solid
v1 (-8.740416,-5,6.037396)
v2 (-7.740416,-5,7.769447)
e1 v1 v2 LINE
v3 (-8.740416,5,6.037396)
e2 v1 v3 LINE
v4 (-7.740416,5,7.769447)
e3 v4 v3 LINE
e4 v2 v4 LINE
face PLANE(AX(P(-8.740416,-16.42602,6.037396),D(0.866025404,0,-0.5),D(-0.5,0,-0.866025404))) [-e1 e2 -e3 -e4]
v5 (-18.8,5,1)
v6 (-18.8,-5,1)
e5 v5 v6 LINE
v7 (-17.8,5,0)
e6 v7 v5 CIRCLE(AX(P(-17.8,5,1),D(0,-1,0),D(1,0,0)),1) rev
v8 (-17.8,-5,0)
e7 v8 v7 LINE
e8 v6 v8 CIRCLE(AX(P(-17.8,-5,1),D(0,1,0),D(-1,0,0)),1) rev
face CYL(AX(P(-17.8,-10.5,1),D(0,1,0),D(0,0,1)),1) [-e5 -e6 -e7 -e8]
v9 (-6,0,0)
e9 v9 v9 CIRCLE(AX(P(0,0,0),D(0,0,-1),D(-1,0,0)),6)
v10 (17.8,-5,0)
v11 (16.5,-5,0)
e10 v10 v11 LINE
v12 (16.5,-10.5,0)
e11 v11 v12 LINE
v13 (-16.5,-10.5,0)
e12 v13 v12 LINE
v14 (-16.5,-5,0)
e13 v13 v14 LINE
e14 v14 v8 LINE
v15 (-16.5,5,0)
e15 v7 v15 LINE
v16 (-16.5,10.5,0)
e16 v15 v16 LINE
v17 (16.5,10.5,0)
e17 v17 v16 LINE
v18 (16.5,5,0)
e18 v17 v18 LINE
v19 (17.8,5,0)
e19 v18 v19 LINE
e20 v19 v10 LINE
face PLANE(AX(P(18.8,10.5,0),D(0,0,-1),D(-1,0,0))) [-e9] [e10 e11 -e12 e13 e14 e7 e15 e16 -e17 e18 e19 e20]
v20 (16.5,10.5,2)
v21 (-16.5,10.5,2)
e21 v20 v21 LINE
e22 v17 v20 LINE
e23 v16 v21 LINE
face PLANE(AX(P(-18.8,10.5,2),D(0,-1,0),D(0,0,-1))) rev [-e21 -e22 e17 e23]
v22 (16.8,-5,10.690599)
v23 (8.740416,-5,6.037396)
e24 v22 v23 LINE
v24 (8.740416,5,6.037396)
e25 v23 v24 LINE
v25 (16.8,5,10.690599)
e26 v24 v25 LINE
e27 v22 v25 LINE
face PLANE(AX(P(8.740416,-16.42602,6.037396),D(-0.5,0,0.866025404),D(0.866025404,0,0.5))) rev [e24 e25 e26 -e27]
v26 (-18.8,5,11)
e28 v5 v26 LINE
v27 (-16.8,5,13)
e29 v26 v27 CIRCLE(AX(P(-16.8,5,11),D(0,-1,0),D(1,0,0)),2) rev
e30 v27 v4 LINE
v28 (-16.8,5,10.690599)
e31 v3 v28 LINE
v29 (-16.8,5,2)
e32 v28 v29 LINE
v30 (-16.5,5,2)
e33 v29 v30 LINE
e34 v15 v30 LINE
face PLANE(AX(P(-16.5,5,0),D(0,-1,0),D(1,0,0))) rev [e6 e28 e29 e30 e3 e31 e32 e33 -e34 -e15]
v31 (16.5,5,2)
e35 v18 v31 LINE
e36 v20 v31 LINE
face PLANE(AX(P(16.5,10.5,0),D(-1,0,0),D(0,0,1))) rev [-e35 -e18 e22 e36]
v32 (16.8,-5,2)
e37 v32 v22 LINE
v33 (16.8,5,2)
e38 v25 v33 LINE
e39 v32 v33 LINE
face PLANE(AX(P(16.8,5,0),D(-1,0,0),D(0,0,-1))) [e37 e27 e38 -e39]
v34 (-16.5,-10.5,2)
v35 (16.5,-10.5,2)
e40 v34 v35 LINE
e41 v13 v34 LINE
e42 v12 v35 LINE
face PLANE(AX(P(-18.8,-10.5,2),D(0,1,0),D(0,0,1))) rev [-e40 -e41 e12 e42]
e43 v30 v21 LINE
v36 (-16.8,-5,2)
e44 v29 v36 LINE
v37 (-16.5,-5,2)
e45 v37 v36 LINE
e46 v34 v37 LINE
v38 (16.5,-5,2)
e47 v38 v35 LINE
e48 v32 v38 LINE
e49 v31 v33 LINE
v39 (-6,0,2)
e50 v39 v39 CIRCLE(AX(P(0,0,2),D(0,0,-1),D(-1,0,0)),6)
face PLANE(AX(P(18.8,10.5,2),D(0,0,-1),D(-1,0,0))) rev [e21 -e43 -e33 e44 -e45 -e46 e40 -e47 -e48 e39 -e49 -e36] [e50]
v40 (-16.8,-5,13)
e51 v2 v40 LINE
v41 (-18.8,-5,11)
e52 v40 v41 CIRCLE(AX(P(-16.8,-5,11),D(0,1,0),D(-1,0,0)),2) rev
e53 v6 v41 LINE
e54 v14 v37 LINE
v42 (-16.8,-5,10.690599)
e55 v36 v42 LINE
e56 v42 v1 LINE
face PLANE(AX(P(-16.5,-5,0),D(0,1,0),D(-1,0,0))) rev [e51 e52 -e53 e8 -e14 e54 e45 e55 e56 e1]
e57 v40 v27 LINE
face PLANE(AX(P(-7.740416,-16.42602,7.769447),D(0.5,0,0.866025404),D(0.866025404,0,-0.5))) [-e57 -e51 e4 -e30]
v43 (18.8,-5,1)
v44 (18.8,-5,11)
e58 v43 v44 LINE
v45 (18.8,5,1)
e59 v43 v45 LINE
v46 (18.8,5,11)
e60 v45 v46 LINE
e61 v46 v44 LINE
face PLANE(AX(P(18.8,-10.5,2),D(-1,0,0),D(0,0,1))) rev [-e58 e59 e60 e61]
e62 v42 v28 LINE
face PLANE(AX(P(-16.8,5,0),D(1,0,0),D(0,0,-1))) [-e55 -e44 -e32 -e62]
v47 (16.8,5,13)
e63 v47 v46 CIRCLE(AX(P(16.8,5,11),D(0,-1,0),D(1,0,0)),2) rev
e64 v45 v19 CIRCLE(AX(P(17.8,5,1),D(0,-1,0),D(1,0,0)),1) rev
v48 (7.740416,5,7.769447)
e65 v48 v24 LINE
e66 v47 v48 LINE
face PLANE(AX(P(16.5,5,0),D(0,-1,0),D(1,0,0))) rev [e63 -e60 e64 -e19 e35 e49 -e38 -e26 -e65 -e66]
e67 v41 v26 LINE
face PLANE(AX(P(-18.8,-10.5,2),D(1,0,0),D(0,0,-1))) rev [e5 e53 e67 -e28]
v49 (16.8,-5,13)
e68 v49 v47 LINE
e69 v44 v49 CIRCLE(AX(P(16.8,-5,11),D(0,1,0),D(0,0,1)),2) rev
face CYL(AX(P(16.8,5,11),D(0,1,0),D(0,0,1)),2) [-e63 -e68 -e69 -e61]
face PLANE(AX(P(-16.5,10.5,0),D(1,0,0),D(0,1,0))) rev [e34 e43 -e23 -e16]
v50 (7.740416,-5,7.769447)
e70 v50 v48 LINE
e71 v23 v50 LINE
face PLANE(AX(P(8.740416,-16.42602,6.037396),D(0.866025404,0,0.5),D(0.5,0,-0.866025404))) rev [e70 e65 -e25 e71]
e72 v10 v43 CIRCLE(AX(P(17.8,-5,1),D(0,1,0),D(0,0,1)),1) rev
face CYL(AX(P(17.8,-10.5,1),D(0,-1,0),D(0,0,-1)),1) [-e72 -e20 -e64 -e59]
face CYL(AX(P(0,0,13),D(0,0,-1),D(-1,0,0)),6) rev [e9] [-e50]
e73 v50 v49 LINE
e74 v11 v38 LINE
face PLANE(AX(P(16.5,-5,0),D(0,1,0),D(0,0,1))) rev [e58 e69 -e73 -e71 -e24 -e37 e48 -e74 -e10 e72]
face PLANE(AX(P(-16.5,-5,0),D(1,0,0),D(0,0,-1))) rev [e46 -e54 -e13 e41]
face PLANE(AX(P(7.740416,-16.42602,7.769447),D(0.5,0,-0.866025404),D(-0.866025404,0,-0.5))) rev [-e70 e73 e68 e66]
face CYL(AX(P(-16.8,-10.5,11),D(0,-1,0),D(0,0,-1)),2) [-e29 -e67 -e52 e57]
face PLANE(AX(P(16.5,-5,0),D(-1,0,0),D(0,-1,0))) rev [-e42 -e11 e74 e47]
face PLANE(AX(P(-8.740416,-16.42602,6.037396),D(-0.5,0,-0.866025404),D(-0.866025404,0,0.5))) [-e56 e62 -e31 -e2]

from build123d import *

# Parameters (mm, degrees)
SKETCH_1_W          = 37.6
SKETCH_1_H          = 21
EXTRUDE_1_DEPTH     = 2
SKETCH_2_W          = 2.3
SKETCH_2_H          = 5.5
CUT_EXTRUDE_1_DEPTH = 22.626141588
SKETCH_4_W          = 13
SKETCH_4_H          = 10
EXTRUDE_2_DEPTH     = 2
EXTRUDE_4_DEPTH     = 10
SKETCH_6_R          = 6
CUT_EXTRUDE_2_DEPTH = 26.153329799
FILLET_1_R          = 2
FILLET_2_R          = 1


with BuildPart() as part:
    # 草图1 → 凸台-拉伸1 (new body)
    with BuildSketch(Plane.XY):
        Rectangle(SKETCH_1_W, SKETCH_1_H)
    extrude(amount=EXTRUDE_1_DEPTH)

    # 草图2 → 切除-拉伸1 (cut, through all)
    with BuildSketch(Plane.XY.offset(2)):
        with Locations((-17.65, 7.75)):
            Rectangle(SKETCH_2_W, SKETCH_2_H)
        with Locations((17.65, 7.75)):
            Rectangle(SKETCH_2_W, SKETCH_2_H)
        with Locations((-17.65, -7.75)):
            Rectangle(SKETCH_2_W, SKETCH_2_H)
        with Locations((17.65, -7.75)):
            Rectangle(SKETCH_2_W, SKETCH_2_H)
    extrude(amount=-CUT_EXTRUDE_1_DEPTH, mode=Mode.SUBTRACT)

    # 草图4 → 凸台-拉伸2 (add)
    with BuildSketch(Plane.ZY.offset(18.8)):
        with Locations((6.5, 0)):
            Rectangle(SKETCH_4_W, SKETCH_4_H)
    extrude_2 = extrude(amount=-EXTRUDE_2_DEPTH)

    # 草图5 → 凸台-拉伸4 (add)
    with BuildSketch(Plane(origin=(0, 5, 0), x_dir=(1, 0, 0), z_dir=(0, 1, 0))):
        Polygon((-8.740415593, -6.037395696), (-16.8, -10.690598923), (-16.8, -13), (-7.740415593, -7.769446504), align=None)
    extrude_4 = extrude(amount=-EXTRUDE_4_DEPTH)

    # 草图6 → 切除-拉伸2 (cut, through all)
    with BuildSketch(Plane(origin=(0, 0, 0), x_dir=(-1, 0, 0), z_dir=(0, 0, -1))):
        Circle(SKETCH_6_R)
    extrude(amount=-CUT_EXTRUDE_2_DEPTH, mode=Mode.SUBTRACT)

    # 镜向2: 凸台-拉伸2 across plane
    add(extrude_2.mirror(Plane(origin=(0, 0, 0), x_dir=(0, 0, 1), z_dir=(1, 0, 0))))

    # 镜向3: 凸台-拉伸4 across plane
    add(extrude_4.mirror(Plane(origin=(0, 0, 0), x_dir=(0, 0, 1), z_dir=(1, 0, 0))))

    # 圆角1
    fillet_1_edges = [part.edges().sort_by_distance(p)[0] for p in [
        (18.8, 0, 13),
        (-18.8, 0, 13),
    ]]
    fillet(fillet_1_edges, radius=FILLET_1_R - 0.0001)  # a hair under: the kernel refuses the full size

    # 圆角2
    fillet_2_edges = [part.edges().sort_by_distance(p)[0] for p in [
        (-18.8, 0, 0),
        (18.8, 0, 0),
    ]]
    fillet(fillet_2_edges, radius=FILLET_2_R)


solid = part.part
